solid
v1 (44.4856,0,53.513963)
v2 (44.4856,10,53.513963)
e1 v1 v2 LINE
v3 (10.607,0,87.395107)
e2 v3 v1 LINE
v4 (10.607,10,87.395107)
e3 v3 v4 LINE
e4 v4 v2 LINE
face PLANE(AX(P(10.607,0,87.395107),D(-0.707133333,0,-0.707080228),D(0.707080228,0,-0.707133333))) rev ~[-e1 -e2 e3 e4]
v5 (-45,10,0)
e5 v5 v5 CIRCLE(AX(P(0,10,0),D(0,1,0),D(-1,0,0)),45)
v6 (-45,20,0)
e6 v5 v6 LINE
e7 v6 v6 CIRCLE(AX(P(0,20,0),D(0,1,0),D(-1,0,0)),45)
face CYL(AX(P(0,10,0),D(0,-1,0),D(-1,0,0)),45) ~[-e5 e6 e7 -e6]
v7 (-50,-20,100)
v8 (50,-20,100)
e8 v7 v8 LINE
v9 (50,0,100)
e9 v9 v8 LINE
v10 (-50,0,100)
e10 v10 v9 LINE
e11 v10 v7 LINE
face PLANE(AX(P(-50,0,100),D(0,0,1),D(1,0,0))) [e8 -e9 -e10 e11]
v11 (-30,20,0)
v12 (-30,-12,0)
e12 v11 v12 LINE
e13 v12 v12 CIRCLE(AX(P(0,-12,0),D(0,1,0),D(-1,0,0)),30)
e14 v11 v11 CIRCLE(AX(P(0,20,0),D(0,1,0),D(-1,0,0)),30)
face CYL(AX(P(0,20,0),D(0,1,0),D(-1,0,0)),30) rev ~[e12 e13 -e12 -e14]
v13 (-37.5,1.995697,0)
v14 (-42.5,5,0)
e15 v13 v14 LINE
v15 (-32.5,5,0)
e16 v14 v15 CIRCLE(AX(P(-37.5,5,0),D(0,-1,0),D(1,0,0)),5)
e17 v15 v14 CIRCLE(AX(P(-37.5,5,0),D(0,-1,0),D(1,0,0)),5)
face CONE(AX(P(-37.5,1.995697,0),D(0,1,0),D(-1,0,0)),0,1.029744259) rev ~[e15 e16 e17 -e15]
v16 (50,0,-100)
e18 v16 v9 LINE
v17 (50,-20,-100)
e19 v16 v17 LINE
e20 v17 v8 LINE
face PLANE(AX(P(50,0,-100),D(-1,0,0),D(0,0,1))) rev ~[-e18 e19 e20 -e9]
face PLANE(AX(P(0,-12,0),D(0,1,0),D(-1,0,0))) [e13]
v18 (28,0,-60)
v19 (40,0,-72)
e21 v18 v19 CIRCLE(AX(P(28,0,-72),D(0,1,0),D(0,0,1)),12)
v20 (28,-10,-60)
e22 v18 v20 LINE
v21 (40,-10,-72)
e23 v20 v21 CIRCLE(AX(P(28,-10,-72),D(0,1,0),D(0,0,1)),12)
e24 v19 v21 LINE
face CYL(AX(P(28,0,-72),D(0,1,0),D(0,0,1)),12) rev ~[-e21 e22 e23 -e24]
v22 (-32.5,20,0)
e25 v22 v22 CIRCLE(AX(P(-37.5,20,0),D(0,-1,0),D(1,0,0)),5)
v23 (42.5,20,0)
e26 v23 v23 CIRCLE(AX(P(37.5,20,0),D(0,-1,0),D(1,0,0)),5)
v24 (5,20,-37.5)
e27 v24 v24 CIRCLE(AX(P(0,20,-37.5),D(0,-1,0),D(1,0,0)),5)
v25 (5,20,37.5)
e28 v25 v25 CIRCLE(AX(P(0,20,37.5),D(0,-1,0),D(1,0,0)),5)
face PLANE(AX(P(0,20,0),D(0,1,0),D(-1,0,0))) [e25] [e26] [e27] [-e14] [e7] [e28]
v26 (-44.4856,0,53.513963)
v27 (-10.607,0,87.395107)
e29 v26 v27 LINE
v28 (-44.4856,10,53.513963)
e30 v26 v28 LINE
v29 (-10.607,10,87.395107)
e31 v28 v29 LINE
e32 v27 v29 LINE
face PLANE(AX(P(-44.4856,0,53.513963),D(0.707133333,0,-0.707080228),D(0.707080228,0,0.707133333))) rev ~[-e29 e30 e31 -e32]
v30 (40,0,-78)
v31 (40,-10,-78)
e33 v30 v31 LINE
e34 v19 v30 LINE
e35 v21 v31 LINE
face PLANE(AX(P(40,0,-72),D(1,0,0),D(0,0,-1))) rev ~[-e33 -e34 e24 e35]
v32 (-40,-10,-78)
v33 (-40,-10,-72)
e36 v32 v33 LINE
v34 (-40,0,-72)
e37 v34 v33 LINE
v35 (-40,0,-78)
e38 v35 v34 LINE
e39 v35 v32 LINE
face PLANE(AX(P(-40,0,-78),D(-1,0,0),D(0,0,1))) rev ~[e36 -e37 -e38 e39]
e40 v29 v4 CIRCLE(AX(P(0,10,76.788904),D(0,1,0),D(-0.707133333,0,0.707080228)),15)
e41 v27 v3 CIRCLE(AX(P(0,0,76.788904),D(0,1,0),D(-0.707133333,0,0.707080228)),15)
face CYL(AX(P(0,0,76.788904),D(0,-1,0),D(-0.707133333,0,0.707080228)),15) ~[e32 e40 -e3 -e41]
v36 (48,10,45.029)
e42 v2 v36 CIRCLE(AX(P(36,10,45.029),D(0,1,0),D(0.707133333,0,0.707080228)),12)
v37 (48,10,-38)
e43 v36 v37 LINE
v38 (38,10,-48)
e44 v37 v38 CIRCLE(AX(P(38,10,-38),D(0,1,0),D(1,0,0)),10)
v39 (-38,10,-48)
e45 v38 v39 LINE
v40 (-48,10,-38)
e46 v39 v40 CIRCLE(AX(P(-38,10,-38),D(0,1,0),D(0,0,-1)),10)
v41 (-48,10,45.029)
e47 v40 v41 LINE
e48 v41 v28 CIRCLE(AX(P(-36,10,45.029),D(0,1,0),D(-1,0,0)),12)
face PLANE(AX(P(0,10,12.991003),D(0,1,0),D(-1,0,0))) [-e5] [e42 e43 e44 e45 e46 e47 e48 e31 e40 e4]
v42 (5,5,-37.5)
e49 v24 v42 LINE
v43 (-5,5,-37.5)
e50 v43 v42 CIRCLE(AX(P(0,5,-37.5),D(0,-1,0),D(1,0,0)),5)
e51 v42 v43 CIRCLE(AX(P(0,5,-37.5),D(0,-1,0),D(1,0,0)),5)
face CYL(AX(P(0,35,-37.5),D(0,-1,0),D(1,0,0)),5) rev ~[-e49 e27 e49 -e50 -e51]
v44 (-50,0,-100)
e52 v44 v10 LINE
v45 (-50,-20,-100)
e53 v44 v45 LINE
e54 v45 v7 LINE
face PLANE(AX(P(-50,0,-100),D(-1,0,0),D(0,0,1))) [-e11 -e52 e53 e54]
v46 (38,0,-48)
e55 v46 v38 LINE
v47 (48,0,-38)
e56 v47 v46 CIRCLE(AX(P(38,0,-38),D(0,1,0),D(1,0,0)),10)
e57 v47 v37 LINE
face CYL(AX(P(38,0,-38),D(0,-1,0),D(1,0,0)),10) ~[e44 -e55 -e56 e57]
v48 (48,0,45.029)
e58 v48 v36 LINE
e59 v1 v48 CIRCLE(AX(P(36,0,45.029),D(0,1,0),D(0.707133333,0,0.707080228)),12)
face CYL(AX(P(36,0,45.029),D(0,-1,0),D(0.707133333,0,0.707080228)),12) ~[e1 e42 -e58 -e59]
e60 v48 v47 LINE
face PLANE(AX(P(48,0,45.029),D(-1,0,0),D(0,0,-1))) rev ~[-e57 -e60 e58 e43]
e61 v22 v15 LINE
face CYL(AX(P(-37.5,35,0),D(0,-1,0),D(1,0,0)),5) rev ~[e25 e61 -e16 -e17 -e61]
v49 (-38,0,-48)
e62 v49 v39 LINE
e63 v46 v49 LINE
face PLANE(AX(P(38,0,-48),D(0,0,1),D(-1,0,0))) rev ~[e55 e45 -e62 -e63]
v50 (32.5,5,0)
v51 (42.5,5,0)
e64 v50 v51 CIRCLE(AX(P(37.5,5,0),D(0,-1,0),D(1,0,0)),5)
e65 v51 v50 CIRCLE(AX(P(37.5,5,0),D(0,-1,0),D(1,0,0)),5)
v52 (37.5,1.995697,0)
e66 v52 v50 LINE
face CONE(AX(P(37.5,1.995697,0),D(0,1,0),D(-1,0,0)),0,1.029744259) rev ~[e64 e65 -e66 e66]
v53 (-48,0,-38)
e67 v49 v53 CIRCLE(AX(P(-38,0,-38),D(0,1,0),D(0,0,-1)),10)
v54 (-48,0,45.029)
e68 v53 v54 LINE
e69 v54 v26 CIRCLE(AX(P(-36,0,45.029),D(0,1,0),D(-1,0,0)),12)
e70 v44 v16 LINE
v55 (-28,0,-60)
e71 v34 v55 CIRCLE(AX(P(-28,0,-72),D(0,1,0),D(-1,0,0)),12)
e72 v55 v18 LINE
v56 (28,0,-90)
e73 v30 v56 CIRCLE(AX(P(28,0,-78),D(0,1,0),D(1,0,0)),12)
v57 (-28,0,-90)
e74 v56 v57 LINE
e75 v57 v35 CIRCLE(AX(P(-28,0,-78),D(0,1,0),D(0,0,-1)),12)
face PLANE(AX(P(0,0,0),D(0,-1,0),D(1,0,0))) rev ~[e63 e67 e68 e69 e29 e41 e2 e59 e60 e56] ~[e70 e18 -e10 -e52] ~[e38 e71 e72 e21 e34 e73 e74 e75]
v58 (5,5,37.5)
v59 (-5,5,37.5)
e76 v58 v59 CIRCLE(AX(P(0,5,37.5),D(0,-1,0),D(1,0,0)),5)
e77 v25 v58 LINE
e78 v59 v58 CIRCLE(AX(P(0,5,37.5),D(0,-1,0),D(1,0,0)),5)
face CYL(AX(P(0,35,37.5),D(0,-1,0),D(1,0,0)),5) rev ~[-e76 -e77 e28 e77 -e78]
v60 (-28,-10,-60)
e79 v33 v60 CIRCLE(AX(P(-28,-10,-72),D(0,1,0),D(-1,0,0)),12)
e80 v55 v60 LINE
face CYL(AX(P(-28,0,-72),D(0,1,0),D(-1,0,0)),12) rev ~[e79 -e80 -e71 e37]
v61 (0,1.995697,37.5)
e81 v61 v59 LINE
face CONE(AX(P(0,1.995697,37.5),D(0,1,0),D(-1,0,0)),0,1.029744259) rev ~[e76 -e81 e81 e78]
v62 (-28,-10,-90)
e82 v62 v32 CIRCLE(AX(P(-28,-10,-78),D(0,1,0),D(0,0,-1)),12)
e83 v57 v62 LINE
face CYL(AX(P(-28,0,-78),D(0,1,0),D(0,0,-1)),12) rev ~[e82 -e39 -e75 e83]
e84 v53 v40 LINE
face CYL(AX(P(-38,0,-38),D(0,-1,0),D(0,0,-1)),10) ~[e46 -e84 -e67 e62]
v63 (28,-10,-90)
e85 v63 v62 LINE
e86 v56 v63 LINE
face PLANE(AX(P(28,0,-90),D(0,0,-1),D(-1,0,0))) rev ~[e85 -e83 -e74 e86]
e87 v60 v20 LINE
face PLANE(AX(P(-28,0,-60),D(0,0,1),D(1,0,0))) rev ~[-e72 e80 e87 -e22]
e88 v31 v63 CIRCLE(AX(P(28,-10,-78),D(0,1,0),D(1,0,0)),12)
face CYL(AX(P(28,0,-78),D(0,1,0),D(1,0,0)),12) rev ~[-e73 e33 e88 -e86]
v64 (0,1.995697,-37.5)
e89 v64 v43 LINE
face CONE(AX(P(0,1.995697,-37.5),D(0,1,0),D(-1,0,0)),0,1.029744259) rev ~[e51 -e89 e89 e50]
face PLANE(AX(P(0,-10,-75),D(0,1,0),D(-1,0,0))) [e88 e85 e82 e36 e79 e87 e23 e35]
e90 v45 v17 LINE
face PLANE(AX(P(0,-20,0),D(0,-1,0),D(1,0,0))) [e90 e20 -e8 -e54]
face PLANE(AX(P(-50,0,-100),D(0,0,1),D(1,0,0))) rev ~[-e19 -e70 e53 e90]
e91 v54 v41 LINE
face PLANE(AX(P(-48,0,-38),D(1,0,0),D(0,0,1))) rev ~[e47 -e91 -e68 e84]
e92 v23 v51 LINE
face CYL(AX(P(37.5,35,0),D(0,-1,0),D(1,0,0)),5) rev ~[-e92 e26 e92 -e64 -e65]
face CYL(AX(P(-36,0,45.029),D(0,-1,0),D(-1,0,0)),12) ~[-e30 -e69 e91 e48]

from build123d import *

# Parameters (mm, degrees)
F0_W      = 100
F0_H      = 200
F1_DEPTH  = 20
F3_DEPTH  = 10
F5_DEPTH  = 10
F6_R      = 45
F6_R_2    = 30
F7_DEPTH  = 10
F8_R      = 30
F9_DEPTH  = 32
F11_D     = 10
F11_DEPTH = 15
F11_TIP   = 3.0043030951


with BuildPart() as f1:
    # F0 (on Front) → F1 (new body)
    with BuildSketch(Plane.XZ):
        Rectangle(F0_W, F0_H)
    extrude(amount=F1_DEPTH)

    # F2 (on face) → F3 (cut)
    with BuildSketch(Plane(origin=(0, 0, 0), x_dir=(-1, 0, 0), z_dir=(0, 1, 0))):
        with BuildLine():
            ThreePointArc((-28, -60), (-36.4852813742, -63.5147186258), (-40, -72))
            Line((-40, -72), (-40, -78))
            ThreePointArc((-40, -78), (-36.4852813742, -86.4852813742), (-28, -90))
            Line((-28, -90), (28, -90))
            ThreePointArc((28, -90), (36.4852813742, -86.4852813742), (40, -78))
            Line((40, -78), (40, -72))
            ThreePointArc((40, -72), (36.4852813742, -63.5147186258), (28, -60))
            Line((28, -60), (-28, -60))
        make_face()
    extrude(amount=-F3_DEPTH, mode=Mode.SUBTRACT)

    # F4 (on face) → F5 (join)
    with BuildSketch(Plane(origin=(0, 0, 0), x_dir=(-1, 0, 0), z_dir=(0, 1, 0))):
        with BuildLine():
            Line((-48, 45.029), (-48, -38))
            ThreePointArc((-48, -38), (-45.0710678119, -45.0710678119), (-38, -48))
            Line((-38, -48), (38, -48))
            ThreePointArc((38, -48), (45.0710678119, -45.0710678119), (48, -38))
            Line((48, -38), (48, 45.029))
            ThreePointArc((48, 45.029), (47.0866406093, 49.6209930314), (44.4856, 53.5139627365))
            Line((44.4856, 53.5139627365), (10.607, 87.3951071902))
            ThreePointArc((10.607, 87.3951071902), (0, 91.7889037696), (-10.607, 87.3951071902))
            Line((-10.607, 87.3951071902), (-44.4856, 53.5139627365))
            ThreePointArc((-44.4856, 53.5139627365), (-47.0866406093, 49.6209930314), (-48, 45.029))
        make_face()
    extrude(amount=F5_DEPTH)

    # F6 (on face) → F7 (join)
    with BuildSketch(Plane(origin=(0, 10, 0), x_dir=(-1, 0, 0), z_dir=(0, 1, 0))):
        Circle(F6_R)
        Circle(F6_R_2, mode=Mode.SUBTRACT)
        Circle(F6_R_2)
    extrude(amount=F7_DEPTH)

    # F8 (on face) → F9 (cut)
    with BuildSketch(Plane(origin=(0, 20, 0), x_dir=(-1, 0, 0), z_dir=(0, 1, 0))):
        Circle(F8_R)
    extrude(amount=-F9_DEPTH, mode=Mode.SUBTRACT)

    # F11
    with Locations(Plane(origin=(0, 20, 0), x_dir=(-1, 0, 0), z_dir=(0, 1, 0))):
        with Locations((-37.5, 0), (0, 37.5), (0, -37.5), (37.5, 0)):
            Hole(F11_D / 2, depth=F11_DEPTH)
            with Locations((0, 0, -(F11_DEPTH + F11_TIP / 2))):  # 118° drill point
                Cone(0, F11_D / 2, F11_TIP, mode=Mode.SUBTRACT)


solid = f1.part
